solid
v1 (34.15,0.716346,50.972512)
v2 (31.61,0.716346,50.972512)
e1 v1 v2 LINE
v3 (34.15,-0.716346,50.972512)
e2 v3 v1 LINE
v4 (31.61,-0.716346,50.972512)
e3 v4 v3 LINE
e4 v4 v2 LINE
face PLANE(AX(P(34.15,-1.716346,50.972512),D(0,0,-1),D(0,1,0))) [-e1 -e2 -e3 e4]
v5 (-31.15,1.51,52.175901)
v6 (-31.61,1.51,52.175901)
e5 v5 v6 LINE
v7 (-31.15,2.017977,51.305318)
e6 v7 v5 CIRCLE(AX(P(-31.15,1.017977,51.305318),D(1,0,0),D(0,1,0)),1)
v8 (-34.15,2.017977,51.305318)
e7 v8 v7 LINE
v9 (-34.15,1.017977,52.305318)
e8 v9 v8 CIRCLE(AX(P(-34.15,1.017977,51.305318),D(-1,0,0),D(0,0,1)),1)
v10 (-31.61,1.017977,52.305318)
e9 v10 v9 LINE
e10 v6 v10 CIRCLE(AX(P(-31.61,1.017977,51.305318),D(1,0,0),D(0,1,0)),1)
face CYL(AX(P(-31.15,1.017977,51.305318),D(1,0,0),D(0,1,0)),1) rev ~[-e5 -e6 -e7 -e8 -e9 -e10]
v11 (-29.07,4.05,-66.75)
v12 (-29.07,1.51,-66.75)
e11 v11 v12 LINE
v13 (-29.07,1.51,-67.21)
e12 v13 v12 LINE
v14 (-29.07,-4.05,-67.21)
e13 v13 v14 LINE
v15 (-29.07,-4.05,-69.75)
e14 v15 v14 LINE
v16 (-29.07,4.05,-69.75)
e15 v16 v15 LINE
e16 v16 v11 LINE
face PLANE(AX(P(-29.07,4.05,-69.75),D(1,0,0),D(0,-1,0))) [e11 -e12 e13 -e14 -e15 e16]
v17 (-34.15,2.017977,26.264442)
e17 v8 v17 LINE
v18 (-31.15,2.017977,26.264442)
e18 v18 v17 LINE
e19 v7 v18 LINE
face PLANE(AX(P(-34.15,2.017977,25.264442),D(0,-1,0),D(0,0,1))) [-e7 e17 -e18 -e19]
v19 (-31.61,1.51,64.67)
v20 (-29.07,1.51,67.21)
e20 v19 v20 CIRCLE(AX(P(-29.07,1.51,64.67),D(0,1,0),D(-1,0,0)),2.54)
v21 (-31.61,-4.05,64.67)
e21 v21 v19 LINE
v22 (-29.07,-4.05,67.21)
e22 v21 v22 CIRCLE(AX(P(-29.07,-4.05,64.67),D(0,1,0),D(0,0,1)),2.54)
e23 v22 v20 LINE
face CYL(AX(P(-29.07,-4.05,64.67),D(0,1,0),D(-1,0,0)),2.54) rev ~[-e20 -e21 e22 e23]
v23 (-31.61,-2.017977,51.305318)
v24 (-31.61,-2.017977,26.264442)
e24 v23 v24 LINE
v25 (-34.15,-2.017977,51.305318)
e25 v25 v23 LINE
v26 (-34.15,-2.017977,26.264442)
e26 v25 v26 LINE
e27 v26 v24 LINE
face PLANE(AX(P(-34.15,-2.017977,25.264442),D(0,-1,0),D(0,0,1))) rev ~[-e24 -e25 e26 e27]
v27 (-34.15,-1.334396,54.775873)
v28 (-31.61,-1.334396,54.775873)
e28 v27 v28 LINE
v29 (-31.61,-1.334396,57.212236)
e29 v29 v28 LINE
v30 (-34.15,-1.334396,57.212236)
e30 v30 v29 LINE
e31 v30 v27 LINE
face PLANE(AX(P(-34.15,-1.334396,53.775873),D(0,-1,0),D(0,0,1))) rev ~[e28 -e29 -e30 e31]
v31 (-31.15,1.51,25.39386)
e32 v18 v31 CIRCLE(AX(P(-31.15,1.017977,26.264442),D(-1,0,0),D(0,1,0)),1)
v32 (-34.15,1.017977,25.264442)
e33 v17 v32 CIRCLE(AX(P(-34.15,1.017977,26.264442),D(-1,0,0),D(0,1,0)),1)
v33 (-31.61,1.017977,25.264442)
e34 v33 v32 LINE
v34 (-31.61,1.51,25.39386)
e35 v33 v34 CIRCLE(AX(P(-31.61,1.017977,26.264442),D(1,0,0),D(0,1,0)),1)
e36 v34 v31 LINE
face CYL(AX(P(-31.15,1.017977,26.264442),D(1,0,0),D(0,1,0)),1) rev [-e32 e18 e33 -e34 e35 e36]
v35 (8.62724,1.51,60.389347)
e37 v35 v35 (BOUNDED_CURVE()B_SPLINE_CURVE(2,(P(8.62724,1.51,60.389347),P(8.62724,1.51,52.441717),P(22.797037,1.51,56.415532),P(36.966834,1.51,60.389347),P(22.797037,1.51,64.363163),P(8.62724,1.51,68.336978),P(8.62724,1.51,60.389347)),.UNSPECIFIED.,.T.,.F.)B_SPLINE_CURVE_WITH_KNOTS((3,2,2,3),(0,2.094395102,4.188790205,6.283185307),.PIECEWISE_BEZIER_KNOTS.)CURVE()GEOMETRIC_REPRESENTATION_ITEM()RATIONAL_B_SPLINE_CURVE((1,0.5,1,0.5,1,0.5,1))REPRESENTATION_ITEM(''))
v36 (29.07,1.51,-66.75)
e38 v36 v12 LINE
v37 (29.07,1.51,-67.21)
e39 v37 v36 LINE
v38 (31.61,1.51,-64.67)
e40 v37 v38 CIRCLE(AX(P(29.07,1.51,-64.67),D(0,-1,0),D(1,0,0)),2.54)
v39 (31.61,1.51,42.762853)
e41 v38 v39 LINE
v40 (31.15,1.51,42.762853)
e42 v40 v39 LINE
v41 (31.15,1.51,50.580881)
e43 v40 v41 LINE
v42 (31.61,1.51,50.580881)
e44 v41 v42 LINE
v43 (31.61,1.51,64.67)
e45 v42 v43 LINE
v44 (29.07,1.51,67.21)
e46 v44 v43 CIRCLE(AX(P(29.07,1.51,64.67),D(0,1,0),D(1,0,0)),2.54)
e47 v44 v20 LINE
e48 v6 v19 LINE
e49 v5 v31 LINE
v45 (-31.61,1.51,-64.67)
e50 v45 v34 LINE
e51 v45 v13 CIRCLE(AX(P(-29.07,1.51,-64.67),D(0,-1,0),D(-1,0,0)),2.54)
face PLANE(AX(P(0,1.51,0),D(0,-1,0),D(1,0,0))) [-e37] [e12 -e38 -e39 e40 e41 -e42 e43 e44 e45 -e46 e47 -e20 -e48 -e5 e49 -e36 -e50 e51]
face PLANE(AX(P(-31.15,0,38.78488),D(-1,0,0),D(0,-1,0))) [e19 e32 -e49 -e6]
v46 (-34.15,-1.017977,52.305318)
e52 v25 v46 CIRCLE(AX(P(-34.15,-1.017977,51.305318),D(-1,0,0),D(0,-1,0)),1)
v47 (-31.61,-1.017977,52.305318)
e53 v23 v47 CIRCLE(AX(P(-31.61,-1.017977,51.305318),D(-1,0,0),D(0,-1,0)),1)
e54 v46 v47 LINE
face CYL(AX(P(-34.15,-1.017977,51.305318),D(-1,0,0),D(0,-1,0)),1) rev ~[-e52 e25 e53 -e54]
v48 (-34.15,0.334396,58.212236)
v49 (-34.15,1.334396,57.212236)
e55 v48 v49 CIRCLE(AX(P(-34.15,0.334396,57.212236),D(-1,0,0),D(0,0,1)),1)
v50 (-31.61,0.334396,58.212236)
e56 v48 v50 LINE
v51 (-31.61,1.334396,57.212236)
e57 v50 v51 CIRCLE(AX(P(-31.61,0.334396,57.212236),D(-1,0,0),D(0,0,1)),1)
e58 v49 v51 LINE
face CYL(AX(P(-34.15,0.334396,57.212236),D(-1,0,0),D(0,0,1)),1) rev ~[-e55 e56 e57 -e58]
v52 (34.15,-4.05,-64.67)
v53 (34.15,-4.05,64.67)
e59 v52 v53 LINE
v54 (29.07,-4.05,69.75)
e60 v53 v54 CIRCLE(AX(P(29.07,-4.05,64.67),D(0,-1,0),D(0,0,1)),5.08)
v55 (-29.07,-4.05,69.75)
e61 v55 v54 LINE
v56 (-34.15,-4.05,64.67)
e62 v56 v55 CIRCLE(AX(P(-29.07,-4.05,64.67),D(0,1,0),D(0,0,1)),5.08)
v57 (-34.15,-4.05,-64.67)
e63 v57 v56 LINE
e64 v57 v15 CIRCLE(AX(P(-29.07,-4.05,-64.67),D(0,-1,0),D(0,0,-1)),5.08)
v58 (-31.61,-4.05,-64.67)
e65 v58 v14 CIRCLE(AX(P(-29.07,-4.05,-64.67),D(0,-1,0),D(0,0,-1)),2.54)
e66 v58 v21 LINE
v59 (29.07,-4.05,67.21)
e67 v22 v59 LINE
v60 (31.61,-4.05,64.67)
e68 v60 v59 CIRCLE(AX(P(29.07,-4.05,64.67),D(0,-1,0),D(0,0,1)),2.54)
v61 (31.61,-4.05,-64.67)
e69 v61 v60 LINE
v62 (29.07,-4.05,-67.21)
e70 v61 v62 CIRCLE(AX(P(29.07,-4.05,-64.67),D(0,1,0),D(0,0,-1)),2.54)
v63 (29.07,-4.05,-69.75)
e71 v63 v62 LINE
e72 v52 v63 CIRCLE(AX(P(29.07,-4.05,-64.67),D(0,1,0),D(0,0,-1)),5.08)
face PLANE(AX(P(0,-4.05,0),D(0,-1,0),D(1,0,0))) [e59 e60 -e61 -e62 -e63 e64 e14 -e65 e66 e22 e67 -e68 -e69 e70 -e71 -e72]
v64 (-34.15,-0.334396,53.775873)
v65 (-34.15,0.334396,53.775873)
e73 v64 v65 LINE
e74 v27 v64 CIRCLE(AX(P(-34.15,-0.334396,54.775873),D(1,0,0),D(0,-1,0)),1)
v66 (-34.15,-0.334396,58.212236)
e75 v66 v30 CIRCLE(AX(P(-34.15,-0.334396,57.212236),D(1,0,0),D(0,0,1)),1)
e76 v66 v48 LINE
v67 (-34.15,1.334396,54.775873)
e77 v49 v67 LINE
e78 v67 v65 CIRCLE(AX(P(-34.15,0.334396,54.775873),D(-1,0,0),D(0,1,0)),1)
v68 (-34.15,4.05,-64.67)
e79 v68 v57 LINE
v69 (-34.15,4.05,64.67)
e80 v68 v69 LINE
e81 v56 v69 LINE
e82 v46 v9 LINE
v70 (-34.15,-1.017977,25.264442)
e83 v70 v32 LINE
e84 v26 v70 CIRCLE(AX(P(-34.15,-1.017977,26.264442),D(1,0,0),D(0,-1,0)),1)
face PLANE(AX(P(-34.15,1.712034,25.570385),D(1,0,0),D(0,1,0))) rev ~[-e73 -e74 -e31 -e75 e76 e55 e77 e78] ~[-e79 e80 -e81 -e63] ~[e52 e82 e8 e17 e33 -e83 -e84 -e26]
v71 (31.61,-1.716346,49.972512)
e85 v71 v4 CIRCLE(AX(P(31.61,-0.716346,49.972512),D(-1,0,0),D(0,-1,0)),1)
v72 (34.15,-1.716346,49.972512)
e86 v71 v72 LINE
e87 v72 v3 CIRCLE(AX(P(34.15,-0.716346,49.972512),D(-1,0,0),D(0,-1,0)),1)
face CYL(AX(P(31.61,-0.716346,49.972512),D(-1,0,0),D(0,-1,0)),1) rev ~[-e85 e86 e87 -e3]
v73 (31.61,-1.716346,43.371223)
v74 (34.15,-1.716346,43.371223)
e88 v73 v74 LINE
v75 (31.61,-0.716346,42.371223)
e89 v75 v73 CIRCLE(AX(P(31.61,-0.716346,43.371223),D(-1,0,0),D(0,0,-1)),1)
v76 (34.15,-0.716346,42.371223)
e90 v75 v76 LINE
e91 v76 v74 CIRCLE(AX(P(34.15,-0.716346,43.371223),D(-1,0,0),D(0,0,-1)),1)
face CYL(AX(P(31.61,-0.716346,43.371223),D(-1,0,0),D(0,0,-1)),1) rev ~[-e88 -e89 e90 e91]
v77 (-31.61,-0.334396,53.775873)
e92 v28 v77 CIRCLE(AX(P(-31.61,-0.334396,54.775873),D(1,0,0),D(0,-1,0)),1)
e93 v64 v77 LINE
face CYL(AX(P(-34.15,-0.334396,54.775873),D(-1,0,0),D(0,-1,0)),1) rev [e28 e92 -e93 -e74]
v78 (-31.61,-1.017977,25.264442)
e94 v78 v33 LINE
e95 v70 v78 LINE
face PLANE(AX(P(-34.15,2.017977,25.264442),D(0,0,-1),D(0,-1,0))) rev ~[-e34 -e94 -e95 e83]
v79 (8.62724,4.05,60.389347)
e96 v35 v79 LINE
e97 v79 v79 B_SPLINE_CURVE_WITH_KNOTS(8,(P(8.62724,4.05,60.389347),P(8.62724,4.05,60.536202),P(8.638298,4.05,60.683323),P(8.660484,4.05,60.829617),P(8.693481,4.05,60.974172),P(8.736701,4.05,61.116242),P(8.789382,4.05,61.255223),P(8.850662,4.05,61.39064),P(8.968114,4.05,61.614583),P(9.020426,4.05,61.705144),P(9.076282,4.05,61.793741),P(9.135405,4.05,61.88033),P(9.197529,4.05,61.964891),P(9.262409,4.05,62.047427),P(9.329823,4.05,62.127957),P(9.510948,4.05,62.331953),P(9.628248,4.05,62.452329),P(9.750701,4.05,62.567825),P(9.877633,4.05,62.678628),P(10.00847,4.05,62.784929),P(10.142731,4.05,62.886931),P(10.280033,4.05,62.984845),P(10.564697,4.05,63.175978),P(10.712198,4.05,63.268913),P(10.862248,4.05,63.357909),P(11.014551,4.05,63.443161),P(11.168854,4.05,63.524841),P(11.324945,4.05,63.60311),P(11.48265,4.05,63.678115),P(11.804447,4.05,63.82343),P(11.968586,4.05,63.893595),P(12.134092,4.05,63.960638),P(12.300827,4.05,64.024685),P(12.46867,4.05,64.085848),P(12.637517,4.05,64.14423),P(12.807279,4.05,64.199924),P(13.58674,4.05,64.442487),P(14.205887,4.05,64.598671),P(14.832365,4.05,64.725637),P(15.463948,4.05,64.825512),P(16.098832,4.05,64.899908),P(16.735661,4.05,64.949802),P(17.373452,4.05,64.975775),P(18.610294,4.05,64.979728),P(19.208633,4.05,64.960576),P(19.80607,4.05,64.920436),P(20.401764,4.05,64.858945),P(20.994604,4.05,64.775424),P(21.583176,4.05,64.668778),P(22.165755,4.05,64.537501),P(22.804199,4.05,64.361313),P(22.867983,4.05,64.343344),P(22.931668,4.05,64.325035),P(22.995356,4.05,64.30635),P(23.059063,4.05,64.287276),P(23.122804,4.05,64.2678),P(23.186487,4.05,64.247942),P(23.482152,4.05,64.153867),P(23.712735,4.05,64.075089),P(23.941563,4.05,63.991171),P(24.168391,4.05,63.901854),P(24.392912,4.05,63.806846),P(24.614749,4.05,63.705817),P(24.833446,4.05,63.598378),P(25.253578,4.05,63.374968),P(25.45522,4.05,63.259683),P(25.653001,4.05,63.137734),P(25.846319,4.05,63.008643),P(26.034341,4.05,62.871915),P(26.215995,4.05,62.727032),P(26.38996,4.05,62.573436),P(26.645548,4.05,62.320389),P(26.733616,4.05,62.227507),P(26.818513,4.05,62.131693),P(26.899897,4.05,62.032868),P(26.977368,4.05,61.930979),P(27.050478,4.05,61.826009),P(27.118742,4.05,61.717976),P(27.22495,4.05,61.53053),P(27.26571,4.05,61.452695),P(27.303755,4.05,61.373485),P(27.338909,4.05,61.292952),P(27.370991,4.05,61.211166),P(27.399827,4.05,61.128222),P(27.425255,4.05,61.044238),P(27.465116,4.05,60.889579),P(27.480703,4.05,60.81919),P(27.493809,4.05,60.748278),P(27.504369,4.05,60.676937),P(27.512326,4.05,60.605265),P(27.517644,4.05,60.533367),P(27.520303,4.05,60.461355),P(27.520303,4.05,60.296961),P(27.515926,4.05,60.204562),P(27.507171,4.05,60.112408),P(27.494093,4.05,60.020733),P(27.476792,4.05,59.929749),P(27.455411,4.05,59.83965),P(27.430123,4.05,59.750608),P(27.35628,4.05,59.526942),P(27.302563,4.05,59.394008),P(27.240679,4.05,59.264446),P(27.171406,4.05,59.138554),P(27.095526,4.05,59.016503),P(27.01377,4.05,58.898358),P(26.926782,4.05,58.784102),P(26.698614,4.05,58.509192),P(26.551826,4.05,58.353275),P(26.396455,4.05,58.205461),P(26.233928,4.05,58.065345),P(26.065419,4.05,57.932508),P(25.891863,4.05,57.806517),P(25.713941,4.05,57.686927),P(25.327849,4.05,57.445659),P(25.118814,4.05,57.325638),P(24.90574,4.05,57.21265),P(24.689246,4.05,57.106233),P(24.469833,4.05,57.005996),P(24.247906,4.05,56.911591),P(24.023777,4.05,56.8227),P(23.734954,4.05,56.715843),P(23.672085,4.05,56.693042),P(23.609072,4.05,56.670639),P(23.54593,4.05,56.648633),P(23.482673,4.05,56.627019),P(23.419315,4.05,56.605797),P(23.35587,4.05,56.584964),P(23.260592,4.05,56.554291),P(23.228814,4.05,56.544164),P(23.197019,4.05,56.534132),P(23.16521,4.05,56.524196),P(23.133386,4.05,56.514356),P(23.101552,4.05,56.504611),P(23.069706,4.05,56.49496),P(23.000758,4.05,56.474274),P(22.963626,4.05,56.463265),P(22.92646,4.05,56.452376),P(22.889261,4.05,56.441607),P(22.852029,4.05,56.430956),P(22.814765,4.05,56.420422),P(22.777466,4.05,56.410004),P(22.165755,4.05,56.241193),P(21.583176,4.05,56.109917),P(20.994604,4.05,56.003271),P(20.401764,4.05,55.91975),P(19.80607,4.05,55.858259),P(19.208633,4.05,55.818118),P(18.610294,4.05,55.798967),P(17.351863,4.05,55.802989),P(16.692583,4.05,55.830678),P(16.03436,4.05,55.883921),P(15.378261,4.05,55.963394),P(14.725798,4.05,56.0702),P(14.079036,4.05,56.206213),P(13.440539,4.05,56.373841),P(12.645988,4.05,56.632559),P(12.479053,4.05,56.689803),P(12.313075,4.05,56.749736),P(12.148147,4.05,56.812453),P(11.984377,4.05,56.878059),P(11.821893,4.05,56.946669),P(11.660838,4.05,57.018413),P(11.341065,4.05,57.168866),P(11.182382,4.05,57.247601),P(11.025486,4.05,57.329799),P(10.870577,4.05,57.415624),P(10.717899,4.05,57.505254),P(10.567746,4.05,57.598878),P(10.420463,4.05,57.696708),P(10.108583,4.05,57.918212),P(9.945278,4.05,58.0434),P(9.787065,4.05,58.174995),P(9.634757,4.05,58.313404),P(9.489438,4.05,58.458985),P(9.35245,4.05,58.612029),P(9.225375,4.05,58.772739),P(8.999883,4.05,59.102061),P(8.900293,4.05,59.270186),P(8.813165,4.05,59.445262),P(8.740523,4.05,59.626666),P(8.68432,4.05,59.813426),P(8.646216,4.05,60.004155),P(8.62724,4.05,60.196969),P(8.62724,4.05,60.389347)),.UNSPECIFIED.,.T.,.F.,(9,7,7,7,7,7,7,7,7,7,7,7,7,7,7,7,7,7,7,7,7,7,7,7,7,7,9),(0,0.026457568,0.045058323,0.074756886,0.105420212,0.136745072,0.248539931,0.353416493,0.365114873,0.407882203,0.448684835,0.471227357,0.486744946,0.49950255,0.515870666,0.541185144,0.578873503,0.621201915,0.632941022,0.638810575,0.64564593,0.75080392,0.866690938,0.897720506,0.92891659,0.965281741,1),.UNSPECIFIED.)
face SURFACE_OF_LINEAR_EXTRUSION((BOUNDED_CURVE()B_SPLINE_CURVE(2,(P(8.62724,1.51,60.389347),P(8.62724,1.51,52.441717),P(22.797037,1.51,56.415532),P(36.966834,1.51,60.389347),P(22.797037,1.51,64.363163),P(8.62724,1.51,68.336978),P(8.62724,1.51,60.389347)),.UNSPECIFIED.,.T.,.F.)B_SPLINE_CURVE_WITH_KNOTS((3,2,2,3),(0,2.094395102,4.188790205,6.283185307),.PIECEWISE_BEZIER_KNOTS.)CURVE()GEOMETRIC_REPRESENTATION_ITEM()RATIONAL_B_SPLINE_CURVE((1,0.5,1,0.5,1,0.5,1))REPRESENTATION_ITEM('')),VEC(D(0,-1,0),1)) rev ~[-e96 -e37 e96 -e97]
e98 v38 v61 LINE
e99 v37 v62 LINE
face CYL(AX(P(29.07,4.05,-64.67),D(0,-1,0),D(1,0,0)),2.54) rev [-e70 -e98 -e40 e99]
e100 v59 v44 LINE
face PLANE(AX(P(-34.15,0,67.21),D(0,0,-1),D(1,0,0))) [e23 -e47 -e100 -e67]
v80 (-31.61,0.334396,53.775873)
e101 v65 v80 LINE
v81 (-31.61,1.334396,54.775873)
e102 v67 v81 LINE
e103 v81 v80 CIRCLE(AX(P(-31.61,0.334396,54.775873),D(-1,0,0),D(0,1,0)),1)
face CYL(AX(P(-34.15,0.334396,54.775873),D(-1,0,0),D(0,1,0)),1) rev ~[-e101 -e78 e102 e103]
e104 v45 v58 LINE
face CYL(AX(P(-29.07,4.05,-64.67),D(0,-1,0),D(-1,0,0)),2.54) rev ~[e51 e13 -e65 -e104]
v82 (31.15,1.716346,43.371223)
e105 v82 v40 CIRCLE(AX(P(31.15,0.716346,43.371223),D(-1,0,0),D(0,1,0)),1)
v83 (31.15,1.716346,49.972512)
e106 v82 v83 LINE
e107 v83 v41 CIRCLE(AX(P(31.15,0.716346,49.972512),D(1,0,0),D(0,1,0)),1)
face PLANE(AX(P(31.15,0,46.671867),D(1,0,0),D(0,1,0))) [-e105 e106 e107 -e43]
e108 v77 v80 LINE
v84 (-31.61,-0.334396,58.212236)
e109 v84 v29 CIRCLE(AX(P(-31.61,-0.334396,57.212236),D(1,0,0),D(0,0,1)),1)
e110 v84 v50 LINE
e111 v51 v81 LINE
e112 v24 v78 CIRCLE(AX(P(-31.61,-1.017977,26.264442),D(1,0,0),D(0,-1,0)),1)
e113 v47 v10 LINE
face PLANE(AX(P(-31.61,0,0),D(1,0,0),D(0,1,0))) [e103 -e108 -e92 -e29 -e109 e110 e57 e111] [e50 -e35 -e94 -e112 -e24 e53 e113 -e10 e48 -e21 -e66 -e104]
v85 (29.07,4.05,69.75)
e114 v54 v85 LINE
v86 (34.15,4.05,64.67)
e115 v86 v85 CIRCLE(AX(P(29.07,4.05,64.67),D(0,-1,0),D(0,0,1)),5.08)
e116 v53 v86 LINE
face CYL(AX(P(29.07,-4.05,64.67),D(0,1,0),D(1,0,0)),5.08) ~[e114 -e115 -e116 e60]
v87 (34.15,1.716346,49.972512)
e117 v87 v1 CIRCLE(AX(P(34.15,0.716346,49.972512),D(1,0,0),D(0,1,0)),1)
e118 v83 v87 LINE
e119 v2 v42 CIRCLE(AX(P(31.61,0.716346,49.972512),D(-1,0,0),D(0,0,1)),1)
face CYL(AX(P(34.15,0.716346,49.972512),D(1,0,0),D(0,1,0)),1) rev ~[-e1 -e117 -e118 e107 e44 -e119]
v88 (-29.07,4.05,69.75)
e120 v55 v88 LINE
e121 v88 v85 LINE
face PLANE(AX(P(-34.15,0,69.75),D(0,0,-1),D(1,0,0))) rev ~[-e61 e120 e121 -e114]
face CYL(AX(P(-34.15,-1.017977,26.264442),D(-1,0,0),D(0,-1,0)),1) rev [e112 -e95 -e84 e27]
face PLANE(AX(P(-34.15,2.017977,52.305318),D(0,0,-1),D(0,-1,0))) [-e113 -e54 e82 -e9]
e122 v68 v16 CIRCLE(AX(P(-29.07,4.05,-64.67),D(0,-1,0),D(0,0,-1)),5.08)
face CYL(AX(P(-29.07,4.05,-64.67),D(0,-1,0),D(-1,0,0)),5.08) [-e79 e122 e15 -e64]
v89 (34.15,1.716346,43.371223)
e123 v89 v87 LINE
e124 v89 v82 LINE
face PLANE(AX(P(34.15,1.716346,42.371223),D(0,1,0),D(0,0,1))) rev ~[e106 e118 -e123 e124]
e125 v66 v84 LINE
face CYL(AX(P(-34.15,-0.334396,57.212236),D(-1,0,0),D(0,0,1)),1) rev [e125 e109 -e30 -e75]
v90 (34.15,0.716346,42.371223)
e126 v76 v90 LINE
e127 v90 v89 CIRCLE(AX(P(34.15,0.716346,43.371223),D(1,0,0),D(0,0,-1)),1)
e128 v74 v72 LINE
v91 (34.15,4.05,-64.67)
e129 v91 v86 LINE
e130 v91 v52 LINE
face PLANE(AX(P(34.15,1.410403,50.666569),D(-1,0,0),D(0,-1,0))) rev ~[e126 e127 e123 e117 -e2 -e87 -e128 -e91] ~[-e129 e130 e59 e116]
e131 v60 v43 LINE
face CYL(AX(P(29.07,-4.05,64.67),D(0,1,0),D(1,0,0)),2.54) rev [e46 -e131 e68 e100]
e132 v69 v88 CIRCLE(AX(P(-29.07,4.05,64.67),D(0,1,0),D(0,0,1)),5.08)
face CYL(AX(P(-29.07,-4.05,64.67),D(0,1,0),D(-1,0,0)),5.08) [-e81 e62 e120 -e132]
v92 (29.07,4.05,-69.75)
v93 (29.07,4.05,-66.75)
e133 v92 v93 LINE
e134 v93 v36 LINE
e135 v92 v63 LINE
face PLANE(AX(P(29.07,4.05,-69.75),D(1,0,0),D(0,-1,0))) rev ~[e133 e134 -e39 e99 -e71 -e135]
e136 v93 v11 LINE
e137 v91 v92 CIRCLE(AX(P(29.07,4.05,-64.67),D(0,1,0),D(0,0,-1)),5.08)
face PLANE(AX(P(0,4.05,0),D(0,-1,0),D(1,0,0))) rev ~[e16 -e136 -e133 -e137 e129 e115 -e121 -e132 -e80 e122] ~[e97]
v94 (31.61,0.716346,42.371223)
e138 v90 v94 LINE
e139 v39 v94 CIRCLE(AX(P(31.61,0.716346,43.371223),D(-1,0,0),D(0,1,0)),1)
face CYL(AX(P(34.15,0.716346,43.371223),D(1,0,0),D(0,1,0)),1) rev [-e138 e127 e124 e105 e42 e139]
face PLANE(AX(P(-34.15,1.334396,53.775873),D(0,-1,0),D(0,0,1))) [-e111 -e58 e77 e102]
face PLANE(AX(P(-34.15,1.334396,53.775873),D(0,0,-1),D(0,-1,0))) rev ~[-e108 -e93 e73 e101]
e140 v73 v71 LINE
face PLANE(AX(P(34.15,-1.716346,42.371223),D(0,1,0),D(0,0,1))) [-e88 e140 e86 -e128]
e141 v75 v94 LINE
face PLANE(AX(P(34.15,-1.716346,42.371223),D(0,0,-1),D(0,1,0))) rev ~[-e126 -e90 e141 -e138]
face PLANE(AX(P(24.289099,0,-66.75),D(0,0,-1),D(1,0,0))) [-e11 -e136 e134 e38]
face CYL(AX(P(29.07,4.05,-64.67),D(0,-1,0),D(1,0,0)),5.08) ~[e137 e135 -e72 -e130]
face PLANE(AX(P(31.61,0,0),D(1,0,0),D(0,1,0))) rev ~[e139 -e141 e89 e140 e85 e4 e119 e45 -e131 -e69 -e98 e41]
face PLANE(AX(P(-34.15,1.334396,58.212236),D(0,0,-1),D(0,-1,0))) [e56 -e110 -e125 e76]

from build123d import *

# Parameters (mm, degrees)
F0_W          = 68.3
F0_H          = 139.5
F1_DEPTH      = 4.05
F2_R          = 5.08
F3_T          = -2.54
F5_DEPTH      = 30
F7_W          = 32.1311485022
F7_H          = 8.1
F8_DEPTH      = 3
F9_W          = 3.4326917958
F9_H          = 8.6012896579
F10_DEPTH     = 3
F11_W         = 2.6687926147
F11_H         = 4.4363630507
F12_DEPTH     = 3
F13_W         = 4.0359543636
F13_H         = 27.0408764482
F14_DEPTH     = 3
F15_W         = 16.4470494014
F15_H         = 8.1
F8_FACE_W     = 9.5618020964
F8_FACE_H     = 8.1
F16_DEPTH     = 3
F19_T1_DEPTH  = 2.54
F19_T3_DEPTH  = 2.54
F19_T8_DEPTH  = 3
F19_T14_DEPTH = 3
F19_T20_DEPTH = 3
F19_T26_DEPTH = 5.5
F19_T32_DEPTH = 3
F19_T38_DEPTH = 3
F19_T44_DEPTH = 3
F19_T50_DEPTH = 5.5
F19_T56_DEPTH = 5.5
F19_T62_DEPTH = 3
F19_T68_DEPTH = 3
F19_T74_DEPTH = 3
F19_T80_DEPTH = 5.5
F19_T86_DEPTH = 3
F19_T92_DEPTH = 3
F19_T98_DEPTH = 3


# Not quite as in the source:
# - a fillet or chamfer that OpenCascade refuses, or shapes differently, is made with other operations: its cross-section is extruded or revolved along the edge and cut away or added
# - a feature of the source that left no trace in its solid (it failed there, or was rolled back) is left out


with BuildPart() as f1:
    # F0 (on Front) → F1 (new body, symmetric)
    with BuildSketch(Plane.XZ):
        Rectangle(F0_W, F0_H)
    extrude(amount=F1_DEPTH, both=True)

    # F2
    f2_edges = [f1.edges().sort_by_distance(p)[0] for p in [
        (-34.15, 0, 69.75),
        (34.15, 0, 69.75),
        (34.15, 0, -69.75),
        (-34.15, 0, -69.75),
    ]]
    fillet(f2_edges, radius=F2_R)

    # F3
    f3_openings = [f1.faces().sort_by_distance(p)[0] for p in [
        (0, -4.05, 0),
    ]]
    offset(amount=F3_T, openings=f3_openings)

    # F4 (on face) → F5 (cut, symmetric)
    with BuildSketch(Plane.XZ.offset(-1.51)):
        with BuildLine():
            add(Edge.make_bspline(
                [(8.6272396147, 60.3893473744), (8.6272396147, 52.4417168684), (22.797036916, 56.4155321214), (36.9668342173, 60.3893473744), (22.797036916, 64.3631626275), (8.6272396147, 68.3369778805), (8.6272396147, 60.3893473744)],
                knots=[0, 0, 0, 2.0943951024, 2.0943951024, 4.1887902048, 4.1887902048, 6.2831853072, 6.2831853072, 6.2831853072], degree=2, weights=[1, 0.5, 1, 0.5, 1, 0.5, 1]))
        make_face()
    extrude(amount=F5_DEPTH, both=True, mode=Mode.SUBTRACT)

    # F7 (on face) → F8 (cut, symmetric)
    with BuildSketch(Plane(origin=(0, 0, -69.75), x_dir=(1, 0, 0), z_dir=(0, 0, -1))):
        with Locations((3.4426236525, 0)):
            Rectangle(F7_W, F7_H)
    extrude(amount=F8_DEPTH, both=True, mode=Mode.SUBTRACT)

    # F9 (on face) → F10 (cut, symmetric)
    with BuildSketch(Plane.YZ.offset(34.15)):
        with Locations((0, 46.6718673706)):
            Rectangle(F9_W, F9_H)
    extrude(amount=F10_DEPTH, both=True, mode=Mode.SUBTRACT)

    # F11 (on face) → F12 (cut, symmetric)
    with BuildSketch(Plane(origin=(-34.15, 0, 0), x_dir=(0, -1, 0), z_dir=(-1, 0, 0))):
        with Locations((0, 55.9940540446)):
            Rectangle(F11_W, F11_H)
    extrude(amount=F12_DEPTH, both=True, mode=Mode.SUBTRACT)

    # F13 (on face) → F14 (cut, symmetric)
    with BuildSketch(Plane(origin=(-34.15, 0, 0), x_dir=(0, -1, 0), z_dir=(-1, 0, 0))):
        with Locations((0, 38.7848801911)):
            Rectangle(F13_W, F13_H)
    extrude(amount=F14_DEPTH, both=True, mode=Mode.SUBTRACT)

    # F15 (on face) + F8_face (on face) → F16 (cut)
    with BuildSketch(Plane(origin=(0, 0, -69.75), x_dir=(1, 0, 0), z_dir=(0, 0, -1))):
        with Locations((-20.8464752993, 0)):
            Rectangle(F15_W, F15_H)
    with BuildSketch(Plane(origin=(-20.8464752993, 0, -69.75), x_dir=(1, 0, 0), z_dir=(0, 0, -1))):
        with Locations((45.1355742511, 0)):
            Rectangle(F8_FACE_W, F8_FACE_H)
    extrude(amount=-F16_DEPTH, mode=Mode.SUBTRACT)

    # F19: fillet of radius 1 on 12 edges, made by hand

    # F19_s2 → F19_t1 (join)
    with BuildSketch(Plane.YZ.offset(-34.15)):
        with BuildLine():
            ThreePointArc((0.3343963074, 58.21223557), (1.0415030885, 57.9193423511), (1.3343963074, 57.21223557))
            Line((1.3343963074, 57.21223557), (1.3343963074, 58.21223557))
            Line((1.3343963074, 58.21223557), (0.3343963074, 58.21223557))
        make_face()
        with BuildLine():
            ThreePointArc((1.3343963074, 54.7758725193), (1.0415030885, 54.0687657381), (0.3343963074, 53.7758725193))
            Line((0.3343963074, 53.7758725193), (1.3343963074, 53.7758725193))
            Line((1.3343963074, 53.7758725193), (1.3343963074, 54.7758725193))
        make_face()
        with BuildLine():
            ThreePointArc((-1.3343963074, 54.7758725193), (-1.0415030885, 54.0687657381), (-0.3343963074, 53.7758725193))
            Line((-0.3343963074, 53.7758725193), (-1.3343963074, 53.7758725193))
            Line((-1.3343963074, 53.7758725193), (-1.3343963074, 54.7758725193))
        make_face()
        with BuildLine():
            ThreePointArc((-0.3343963074, 58.21223557), (-1.0415030885, 57.9193423511), (-1.3343963074, 57.21223557))
            Line((-1.3343963074, 57.21223557), (-1.3343963074, 58.21223557))
            Line((-1.3343963074, 58.21223557), (-0.3343963074, 58.21223557))
        make_face()
        with BuildLine():
            ThreePointArc((-2.0179771818, 26.264441967), (-1.725083963, 25.5573351858), (-1.0179771818, 25.264441967))
            Line((-1.0179771818, 25.264441967), (-2.0179771818, 25.264441967))
            Line((-2.0179771818, 25.264441967), (-2.0179771818, 26.264441967))
        make_face()
        with BuildLine():
            ThreePointArc((-2.0179771818, 51.3053184152), (-1.725083963, 52.0124251964), (-1.0179771818, 52.3053184152))
            Line((-1.0179771818, 52.3053184152), (-2.0179771818, 52.3053184152))
            Line((-2.0179771818, 52.3053184152), (-2.0179771818, 51.3053184152))
        make_face()
    extrude(amount=F19_T1_DEPTH)

    # F19_s4 → F19_t3 (join)
    with BuildSketch(Plane.YZ.offset(31.61)):
        with BuildLine():
            ThreePointArc((-0.7163458979, 42.3712225417), (-1.4234526791, 42.6641157605), (-1.7163458979, 43.3712225417))
            Line((-1.7163458979, 43.3712225417), (-1.7163458979, 42.3712225417))
            Line((-1.7163458979, 42.3712225417), (-0.7163458979, 42.3712225417))
        make_face()
        with BuildLine():
            ThreePointArc((-1.7163458979, 49.9725121995), (-1.4234526791, 50.6796189807), (-0.7163458979, 50.9725121995))
            Line((-0.7163458979, 50.9725121995), (-1.7163458979, 50.9725121995))
            Line((-1.7163458979, 50.9725121995), (-1.7163458979, 49.9725121995))
        make_face()
    extrude(amount=F19_T3_DEPTH)


with BuildPart() as f19_tool6:
    # F19_s7 → F19_t8 (new body)
    with BuildSketch(Plane.YZ.offset(34.15)):
        with BuildLine():
            ThreePointArc((1.7163458979, 43.3712225417), (1.4234526791, 42.6641157605), (0.7163458979, 42.3712225417))
            Line((0.7163458979, 42.3712225417), (1.7163458979, 42.3712225417))
            Line((1.7163458979, 42.3712225417), (1.7163458979, 43.3712225417))
        make_face()
    extrude(amount=-F19_T8_DEPTH)

    split(bisect_by=Plane.XZ.offset(-1.51), keep=Keep.BOTTOM)

    split(bisect_by=Plane.YZ.offset(31.61), keep=Keep.TOP)


with BuildPart() as f1_1:
    add(f1.part)

    # F19_t5: union F19_tool6
    add(f19_tool6.part)


with BuildPart() as f19_tool12:
    # F19_s13 → F19_t14 (new body)
    with BuildSketch(Plane.YZ.offset(34.15)):
        with BuildLine():
            ThreePointArc((1.7163458979, 43.3712225417), (1.4234526791, 42.6641157605), (0.7163458979, 42.3712225417))
            Line((0.7163458979, 42.3712225417), (1.7163458979, 42.3712225417))
            Line((1.7163458979, 42.3712225417), (1.7163458979, 43.3712225417))
        make_face()
    extrude(amount=-F19_T14_DEPTH)

    split(bisect_by=Plane.XZ.offset(-1.51), keep=Keep.TOP)

    split(bisect_by=Plane.YZ.offset(31.61), keep=Keep.TOP)


with BuildPart() as f1_2:
    add(f1_1.part)

    # F19_t11: union F19_tool12
    add(f19_tool12.part)


with BuildPart() as f19_tool18:
    # F19_s19 → F19_t20 (new body)
    with BuildSketch(Plane.YZ.offset(34.15)):
        with BuildLine():
            ThreePointArc((1.7163458979, 43.3712225417), (1.4234526791, 42.6641157605), (0.7163458979, 42.3712225417))
            Line((0.7163458979, 42.3712225417), (1.7163458979, 42.3712225417))
            Line((1.7163458979, 42.3712225417), (1.7163458979, 43.3712225417))
        make_face()
    extrude(amount=-F19_T20_DEPTH)

    split(bisect_by=Plane.XZ.offset(-1.51), keep=Keep.BOTTOM)

    split(bisect_by=Plane.YZ.offset(31.61), keep=Keep.BOTTOM)


with BuildPart() as f1_3:
    add(f1_2.part)

    # F19_t17: union F19_tool18
    add(f19_tool18.part)


with BuildPart() as f19_tool24:
    # F19_s25 → F19_t26 (new body)
    with BuildSketch(Plane.YZ.offset(34.15)):
        with BuildLine():
            ThreePointArc((1.7163458979, 43.3712225417), (1.4234526791, 42.6641157605), (0.7163458979, 42.3712225417))
            Line((0.7163458979, 42.3712225417), (1.7163458979, 42.3712225417))
            Line((1.7163458979, 42.3712225417), (1.7163458979, 43.3712225417))
        make_face()
    extrude(amount=-F19_T26_DEPTH)

    split(bisect_by=Plane.YZ.offset(31.15), keep=Keep.BOTTOM)

    split(bisect_by=Plane.XZ.offset(-1.51), keep=Keep.BOTTOM)


with BuildPart() as f1_4:
    add(f1_3.part)

    # F19_t23: union F19_tool24
    add(f19_tool24.part)


with BuildPart() as f19_tool30:
    # F19_s31 → F19_t32 (new body)
    with BuildSketch(Plane.YZ.offset(34.15)):
        with BuildLine():
            ThreePointArc((1.7163458979, 49.9725121995), (1.4234526791, 50.6796189807), (0.7163458979, 50.9725121995))
            Line((0.7163458979, 50.9725121995), (1.7163458979, 50.9725121995))
            Line((1.7163458979, 50.9725121995), (1.7163458979, 49.9725121995))
        make_face()
    extrude(amount=-F19_T32_DEPTH)

    split(bisect_by=Plane.XZ.offset(-1.51), keep=Keep.BOTTOM)

    split(bisect_by=Plane.YZ.offset(31.61), keep=Keep.TOP)


with BuildPart() as f1_5:
    add(f1_4.part)

    # F19_t29: union F19_tool30
    add(f19_tool30.part)


with BuildPart() as f19_tool36:
    # F19_s37 → F19_t38 (new body)
    with BuildSketch(Plane.YZ.offset(34.15)):
        with BuildLine():
            ThreePointArc((1.7163458979, 49.9725121995), (1.4234526791, 50.6796189807), (0.7163458979, 50.9725121995))
            Line((0.7163458979, 50.9725121995), (1.7163458979, 50.9725121995))
            Line((1.7163458979, 50.9725121995), (1.7163458979, 49.9725121995))
        make_face()
    extrude(amount=-F19_T38_DEPTH)

    split(bisect_by=Plane.XZ.offset(-1.51), keep=Keep.TOP)

    split(bisect_by=Plane.YZ.offset(31.61), keep=Keep.TOP)


with BuildPart() as f1_6:
    add(f1_5.part)

    # F19_t35: union F19_tool36
    add(f19_tool36.part)


with BuildPart() as f19_tool42:
    # F19_s43 → F19_t44 (new body)
    with BuildSketch(Plane.YZ.offset(34.15)):
        with BuildLine():
            ThreePointArc((1.7163458979, 49.9725121995), (1.4234526791, 50.6796189807), (0.7163458979, 50.9725121995))
            Line((0.7163458979, 50.9725121995), (1.7163458979, 50.9725121995))
            Line((1.7163458979, 50.9725121995), (1.7163458979, 49.9725121995))
        make_face()
    extrude(amount=-F19_T44_DEPTH)

    split(bisect_by=Plane.XZ.offset(-1.51), keep=Keep.BOTTOM)

    split(bisect_by=Plane.YZ.offset(31.61), keep=Keep.BOTTOM)


with BuildPart() as f1_7:
    add(f1_6.part)

    # F19_t41: union F19_tool42
    add(f19_tool42.part)


with BuildPart() as f19_tool48:
    # F19_s49 → F19_t50 (new body)
    with BuildSketch(Plane.YZ.offset(34.15)):
        with BuildLine():
            ThreePointArc((1.7163458979, 49.9725121995), (1.4234526791, 50.6796189807), (0.7163458979, 50.9725121995))
            Line((0.7163458979, 50.9725121995), (1.7163458979, 50.9725121995))
            Line((1.7163458979, 50.9725121995), (1.7163458979, 49.9725121995))
        make_face()
    extrude(amount=-F19_T50_DEPTH)

    split(bisect_by=Plane.YZ.offset(31.15), keep=Keep.BOTTOM)

    split(bisect_by=Plane.XZ.offset(-1.51), keep=Keep.BOTTOM)


with BuildPart() as f1_8:
    add(f1_7.part)

    # F19_t47: union F19_tool48
    add(f19_tool48.part)


with BuildPart() as f19_tool54:
    # F19_s55 → F19_t56 (new body)
    with BuildSketch(Plane.YZ.offset(-28.65)):
        with BuildLine():
            ThreePointArc((2.0179771818, 51.3053184152), (1.725083963, 52.0124251964), (1.0179771818, 52.3053184152))
            Line((1.0179771818, 52.3053184152), (2.0179771818, 52.3053184152))
            Line((2.0179771818, 52.3053184152), (2.0179771818, 51.3053184152))
        make_face()
    extrude(amount=-F19_T56_DEPTH)

    split(bisect_by=Plane.XZ.offset(-1.51), keep=Keep.BOTTOM)

    split(bisect_by=Plane.YZ.offset(-31.15), keep=Keep.TOP)


with BuildPart() as f1_9:
    add(f1_8.part)

    # F19_t53: union F19_tool54
    add(f19_tool54.part)


with BuildPart() as f19_tool60:
    # F19_s61 → F19_t62 (new body)
    with BuildSketch(Plane.YZ.offset(-31.15)):
        with BuildLine():
            ThreePointArc((2.0179771818, 51.3053184152), (1.725083963, 52.0124251964), (1.0179771818, 52.3053184152))
            Line((1.0179771818, 52.3053184152), (2.0179771818, 52.3053184152))
            Line((2.0179771818, 52.3053184152), (2.0179771818, 51.3053184152))
        make_face()
    extrude(amount=-F19_T62_DEPTH)

    split(bisect_by=Plane.XZ.offset(-1.51), keep=Keep.BOTTOM)

    split(bisect_by=Plane.YZ.offset(-31.61), keep=Keep.TOP)


with BuildPart() as f1_10:
    add(f1_9.part)

    # F19_t59: union F19_tool60
    add(f19_tool60.part)


with BuildPart() as f19_tool66:
    # F19_s67 → F19_t68 (new body)
    with BuildSketch(Plane.YZ.offset(-31.15)):
        with BuildLine():
            ThreePointArc((2.0179771818, 51.3053184152), (1.725083963, 52.0124251964), (1.0179771818, 52.3053184152))
            Line((1.0179771818, 52.3053184152), (2.0179771818, 52.3053184152))
            Line((2.0179771818, 52.3053184152), (2.0179771818, 51.3053184152))
        make_face()
    extrude(amount=-F19_T68_DEPTH)

    split(bisect_by=Plane.XZ.offset(-1.51), keep=Keep.BOTTOM)

    split(bisect_by=Plane.YZ.offset(-31.61), keep=Keep.BOTTOM)


with BuildPart() as f1_11:
    add(f1_10.part)

    # F19_t65: union F19_tool66
    add(f19_tool66.part)


with BuildPart() as f19_tool72:
    # F19_s73 → F19_t74 (new body)
    with BuildSketch(Plane.YZ.offset(-31.15)):
        with BuildLine():
            ThreePointArc((2.0179771818, 51.3053184152), (1.725083963, 52.0124251964), (1.0179771818, 52.3053184152))
            Line((1.0179771818, 52.3053184152), (2.0179771818, 52.3053184152))
            Line((2.0179771818, 52.3053184152), (2.0179771818, 51.3053184152))
        make_face()
    extrude(amount=-F19_T74_DEPTH)

    split(bisect_by=Plane.XZ.offset(-1.51), keep=Keep.TOP)

    split(bisect_by=Plane.YZ.offset(-31.61), keep=Keep.BOTTOM)


with BuildPart() as f1_12:
    add(f1_11.part)

    # F19_t71: union F19_tool72
    add(f19_tool72.part)


with BuildPart() as f19_tool78:
    # F19_s79 → F19_t80 (new body)
    with BuildSketch(Plane.YZ.offset(-28.65)):
        with BuildLine():
            ThreePointArc((2.0179771818, 26.264441967), (1.725083963, 25.5573351858), (1.0179771818, 25.264441967))
            Line((1.0179771818, 25.264441967), (2.0179771818, 25.264441967))
            Line((2.0179771818, 25.264441967), (2.0179771818, 26.264441967))
        make_face()
    extrude(amount=-F19_T80_DEPTH)

    split(bisect_by=Plane.XZ.offset(-1.51), keep=Keep.BOTTOM)

    split(bisect_by=Plane.YZ.offset(-31.15), keep=Keep.TOP)


with BuildPart() as f1_13:
    add(f1_12.part)

    # F19_t77: union F19_tool78
    add(f19_tool78.part)


with BuildPart() as f19_tool84:
    # F19_s85 → F19_t86 (new body)
    with BuildSketch(Plane.YZ.offset(-31.15)):
        with BuildLine():
            ThreePointArc((2.0179771818, 26.264441967), (1.725083963, 25.5573351858), (1.0179771818, 25.264441967))
            Line((1.0179771818, 25.264441967), (2.0179771818, 25.264441967))
            Line((2.0179771818, 25.264441967), (2.0179771818, 26.264441967))
        make_face()
    extrude(amount=-F19_T86_DEPTH)

    split(bisect_by=Plane.XZ.offset(-1.51), keep=Keep.BOTTOM)

    split(bisect_by=Plane.YZ.offset(-31.61), keep=Keep.TOP)


with BuildPart() as f1_14:
    add(f1_13.part)

    # F19_t83: union F19_tool84
    add(f19_tool84.part)


with BuildPart() as f19_tool90:
    # F19_s91 → F19_t92 (new body)
    with BuildSketch(Plane.YZ.offset(-31.15)):
        with BuildLine():
            ThreePointArc((2.0179771818, 26.264441967), (1.725083963, 25.5573351858), (1.0179771818, 25.264441967))
            Line((1.0179771818, 25.264441967), (2.0179771818, 25.264441967))
            Line((2.0179771818, 25.264441967), (2.0179771818, 26.264441967))
        make_face()
    extrude(amount=-F19_T92_DEPTH)

    split(bisect_by=Plane.XZ.offset(-1.51), keep=Keep.BOTTOM)

    split(bisect_by=Plane.YZ.offset(-31.61), keep=Keep.BOTTOM)


with BuildPart() as f1_15:
    add(f1_14.part)

    # F19_t89: union F19_tool90
    add(f19_tool90.part)


with BuildPart() as f19_tool96:
    # F19_s97 → F19_t98 (new body)
    with BuildSketch(Plane.YZ.offset(-31.15)):
        with BuildLine():
            ThreePointArc((2.0179771818, 26.264441967), (1.725083963, 25.5573351858), (1.0179771818, 25.264441967))
            Line((1.0179771818, 25.264441967), (2.0179771818, 25.264441967))
            Line((2.0179771818, 25.264441967), (2.0179771818, 26.264441967))
        make_face()
    extrude(amount=-F19_T98_DEPTH)

    split(bisect_by=Plane.XZ.offset(-1.51), keep=Keep.TOP)

    split(bisect_by=Plane.YZ.offset(-31.61), keep=Keep.BOTTOM)


with BuildPart() as f1_16:
    add(f1_15.part)

    # F19_t95: union F19_tool96
    add(f19_tool96.part)


solid = f1_16.part
